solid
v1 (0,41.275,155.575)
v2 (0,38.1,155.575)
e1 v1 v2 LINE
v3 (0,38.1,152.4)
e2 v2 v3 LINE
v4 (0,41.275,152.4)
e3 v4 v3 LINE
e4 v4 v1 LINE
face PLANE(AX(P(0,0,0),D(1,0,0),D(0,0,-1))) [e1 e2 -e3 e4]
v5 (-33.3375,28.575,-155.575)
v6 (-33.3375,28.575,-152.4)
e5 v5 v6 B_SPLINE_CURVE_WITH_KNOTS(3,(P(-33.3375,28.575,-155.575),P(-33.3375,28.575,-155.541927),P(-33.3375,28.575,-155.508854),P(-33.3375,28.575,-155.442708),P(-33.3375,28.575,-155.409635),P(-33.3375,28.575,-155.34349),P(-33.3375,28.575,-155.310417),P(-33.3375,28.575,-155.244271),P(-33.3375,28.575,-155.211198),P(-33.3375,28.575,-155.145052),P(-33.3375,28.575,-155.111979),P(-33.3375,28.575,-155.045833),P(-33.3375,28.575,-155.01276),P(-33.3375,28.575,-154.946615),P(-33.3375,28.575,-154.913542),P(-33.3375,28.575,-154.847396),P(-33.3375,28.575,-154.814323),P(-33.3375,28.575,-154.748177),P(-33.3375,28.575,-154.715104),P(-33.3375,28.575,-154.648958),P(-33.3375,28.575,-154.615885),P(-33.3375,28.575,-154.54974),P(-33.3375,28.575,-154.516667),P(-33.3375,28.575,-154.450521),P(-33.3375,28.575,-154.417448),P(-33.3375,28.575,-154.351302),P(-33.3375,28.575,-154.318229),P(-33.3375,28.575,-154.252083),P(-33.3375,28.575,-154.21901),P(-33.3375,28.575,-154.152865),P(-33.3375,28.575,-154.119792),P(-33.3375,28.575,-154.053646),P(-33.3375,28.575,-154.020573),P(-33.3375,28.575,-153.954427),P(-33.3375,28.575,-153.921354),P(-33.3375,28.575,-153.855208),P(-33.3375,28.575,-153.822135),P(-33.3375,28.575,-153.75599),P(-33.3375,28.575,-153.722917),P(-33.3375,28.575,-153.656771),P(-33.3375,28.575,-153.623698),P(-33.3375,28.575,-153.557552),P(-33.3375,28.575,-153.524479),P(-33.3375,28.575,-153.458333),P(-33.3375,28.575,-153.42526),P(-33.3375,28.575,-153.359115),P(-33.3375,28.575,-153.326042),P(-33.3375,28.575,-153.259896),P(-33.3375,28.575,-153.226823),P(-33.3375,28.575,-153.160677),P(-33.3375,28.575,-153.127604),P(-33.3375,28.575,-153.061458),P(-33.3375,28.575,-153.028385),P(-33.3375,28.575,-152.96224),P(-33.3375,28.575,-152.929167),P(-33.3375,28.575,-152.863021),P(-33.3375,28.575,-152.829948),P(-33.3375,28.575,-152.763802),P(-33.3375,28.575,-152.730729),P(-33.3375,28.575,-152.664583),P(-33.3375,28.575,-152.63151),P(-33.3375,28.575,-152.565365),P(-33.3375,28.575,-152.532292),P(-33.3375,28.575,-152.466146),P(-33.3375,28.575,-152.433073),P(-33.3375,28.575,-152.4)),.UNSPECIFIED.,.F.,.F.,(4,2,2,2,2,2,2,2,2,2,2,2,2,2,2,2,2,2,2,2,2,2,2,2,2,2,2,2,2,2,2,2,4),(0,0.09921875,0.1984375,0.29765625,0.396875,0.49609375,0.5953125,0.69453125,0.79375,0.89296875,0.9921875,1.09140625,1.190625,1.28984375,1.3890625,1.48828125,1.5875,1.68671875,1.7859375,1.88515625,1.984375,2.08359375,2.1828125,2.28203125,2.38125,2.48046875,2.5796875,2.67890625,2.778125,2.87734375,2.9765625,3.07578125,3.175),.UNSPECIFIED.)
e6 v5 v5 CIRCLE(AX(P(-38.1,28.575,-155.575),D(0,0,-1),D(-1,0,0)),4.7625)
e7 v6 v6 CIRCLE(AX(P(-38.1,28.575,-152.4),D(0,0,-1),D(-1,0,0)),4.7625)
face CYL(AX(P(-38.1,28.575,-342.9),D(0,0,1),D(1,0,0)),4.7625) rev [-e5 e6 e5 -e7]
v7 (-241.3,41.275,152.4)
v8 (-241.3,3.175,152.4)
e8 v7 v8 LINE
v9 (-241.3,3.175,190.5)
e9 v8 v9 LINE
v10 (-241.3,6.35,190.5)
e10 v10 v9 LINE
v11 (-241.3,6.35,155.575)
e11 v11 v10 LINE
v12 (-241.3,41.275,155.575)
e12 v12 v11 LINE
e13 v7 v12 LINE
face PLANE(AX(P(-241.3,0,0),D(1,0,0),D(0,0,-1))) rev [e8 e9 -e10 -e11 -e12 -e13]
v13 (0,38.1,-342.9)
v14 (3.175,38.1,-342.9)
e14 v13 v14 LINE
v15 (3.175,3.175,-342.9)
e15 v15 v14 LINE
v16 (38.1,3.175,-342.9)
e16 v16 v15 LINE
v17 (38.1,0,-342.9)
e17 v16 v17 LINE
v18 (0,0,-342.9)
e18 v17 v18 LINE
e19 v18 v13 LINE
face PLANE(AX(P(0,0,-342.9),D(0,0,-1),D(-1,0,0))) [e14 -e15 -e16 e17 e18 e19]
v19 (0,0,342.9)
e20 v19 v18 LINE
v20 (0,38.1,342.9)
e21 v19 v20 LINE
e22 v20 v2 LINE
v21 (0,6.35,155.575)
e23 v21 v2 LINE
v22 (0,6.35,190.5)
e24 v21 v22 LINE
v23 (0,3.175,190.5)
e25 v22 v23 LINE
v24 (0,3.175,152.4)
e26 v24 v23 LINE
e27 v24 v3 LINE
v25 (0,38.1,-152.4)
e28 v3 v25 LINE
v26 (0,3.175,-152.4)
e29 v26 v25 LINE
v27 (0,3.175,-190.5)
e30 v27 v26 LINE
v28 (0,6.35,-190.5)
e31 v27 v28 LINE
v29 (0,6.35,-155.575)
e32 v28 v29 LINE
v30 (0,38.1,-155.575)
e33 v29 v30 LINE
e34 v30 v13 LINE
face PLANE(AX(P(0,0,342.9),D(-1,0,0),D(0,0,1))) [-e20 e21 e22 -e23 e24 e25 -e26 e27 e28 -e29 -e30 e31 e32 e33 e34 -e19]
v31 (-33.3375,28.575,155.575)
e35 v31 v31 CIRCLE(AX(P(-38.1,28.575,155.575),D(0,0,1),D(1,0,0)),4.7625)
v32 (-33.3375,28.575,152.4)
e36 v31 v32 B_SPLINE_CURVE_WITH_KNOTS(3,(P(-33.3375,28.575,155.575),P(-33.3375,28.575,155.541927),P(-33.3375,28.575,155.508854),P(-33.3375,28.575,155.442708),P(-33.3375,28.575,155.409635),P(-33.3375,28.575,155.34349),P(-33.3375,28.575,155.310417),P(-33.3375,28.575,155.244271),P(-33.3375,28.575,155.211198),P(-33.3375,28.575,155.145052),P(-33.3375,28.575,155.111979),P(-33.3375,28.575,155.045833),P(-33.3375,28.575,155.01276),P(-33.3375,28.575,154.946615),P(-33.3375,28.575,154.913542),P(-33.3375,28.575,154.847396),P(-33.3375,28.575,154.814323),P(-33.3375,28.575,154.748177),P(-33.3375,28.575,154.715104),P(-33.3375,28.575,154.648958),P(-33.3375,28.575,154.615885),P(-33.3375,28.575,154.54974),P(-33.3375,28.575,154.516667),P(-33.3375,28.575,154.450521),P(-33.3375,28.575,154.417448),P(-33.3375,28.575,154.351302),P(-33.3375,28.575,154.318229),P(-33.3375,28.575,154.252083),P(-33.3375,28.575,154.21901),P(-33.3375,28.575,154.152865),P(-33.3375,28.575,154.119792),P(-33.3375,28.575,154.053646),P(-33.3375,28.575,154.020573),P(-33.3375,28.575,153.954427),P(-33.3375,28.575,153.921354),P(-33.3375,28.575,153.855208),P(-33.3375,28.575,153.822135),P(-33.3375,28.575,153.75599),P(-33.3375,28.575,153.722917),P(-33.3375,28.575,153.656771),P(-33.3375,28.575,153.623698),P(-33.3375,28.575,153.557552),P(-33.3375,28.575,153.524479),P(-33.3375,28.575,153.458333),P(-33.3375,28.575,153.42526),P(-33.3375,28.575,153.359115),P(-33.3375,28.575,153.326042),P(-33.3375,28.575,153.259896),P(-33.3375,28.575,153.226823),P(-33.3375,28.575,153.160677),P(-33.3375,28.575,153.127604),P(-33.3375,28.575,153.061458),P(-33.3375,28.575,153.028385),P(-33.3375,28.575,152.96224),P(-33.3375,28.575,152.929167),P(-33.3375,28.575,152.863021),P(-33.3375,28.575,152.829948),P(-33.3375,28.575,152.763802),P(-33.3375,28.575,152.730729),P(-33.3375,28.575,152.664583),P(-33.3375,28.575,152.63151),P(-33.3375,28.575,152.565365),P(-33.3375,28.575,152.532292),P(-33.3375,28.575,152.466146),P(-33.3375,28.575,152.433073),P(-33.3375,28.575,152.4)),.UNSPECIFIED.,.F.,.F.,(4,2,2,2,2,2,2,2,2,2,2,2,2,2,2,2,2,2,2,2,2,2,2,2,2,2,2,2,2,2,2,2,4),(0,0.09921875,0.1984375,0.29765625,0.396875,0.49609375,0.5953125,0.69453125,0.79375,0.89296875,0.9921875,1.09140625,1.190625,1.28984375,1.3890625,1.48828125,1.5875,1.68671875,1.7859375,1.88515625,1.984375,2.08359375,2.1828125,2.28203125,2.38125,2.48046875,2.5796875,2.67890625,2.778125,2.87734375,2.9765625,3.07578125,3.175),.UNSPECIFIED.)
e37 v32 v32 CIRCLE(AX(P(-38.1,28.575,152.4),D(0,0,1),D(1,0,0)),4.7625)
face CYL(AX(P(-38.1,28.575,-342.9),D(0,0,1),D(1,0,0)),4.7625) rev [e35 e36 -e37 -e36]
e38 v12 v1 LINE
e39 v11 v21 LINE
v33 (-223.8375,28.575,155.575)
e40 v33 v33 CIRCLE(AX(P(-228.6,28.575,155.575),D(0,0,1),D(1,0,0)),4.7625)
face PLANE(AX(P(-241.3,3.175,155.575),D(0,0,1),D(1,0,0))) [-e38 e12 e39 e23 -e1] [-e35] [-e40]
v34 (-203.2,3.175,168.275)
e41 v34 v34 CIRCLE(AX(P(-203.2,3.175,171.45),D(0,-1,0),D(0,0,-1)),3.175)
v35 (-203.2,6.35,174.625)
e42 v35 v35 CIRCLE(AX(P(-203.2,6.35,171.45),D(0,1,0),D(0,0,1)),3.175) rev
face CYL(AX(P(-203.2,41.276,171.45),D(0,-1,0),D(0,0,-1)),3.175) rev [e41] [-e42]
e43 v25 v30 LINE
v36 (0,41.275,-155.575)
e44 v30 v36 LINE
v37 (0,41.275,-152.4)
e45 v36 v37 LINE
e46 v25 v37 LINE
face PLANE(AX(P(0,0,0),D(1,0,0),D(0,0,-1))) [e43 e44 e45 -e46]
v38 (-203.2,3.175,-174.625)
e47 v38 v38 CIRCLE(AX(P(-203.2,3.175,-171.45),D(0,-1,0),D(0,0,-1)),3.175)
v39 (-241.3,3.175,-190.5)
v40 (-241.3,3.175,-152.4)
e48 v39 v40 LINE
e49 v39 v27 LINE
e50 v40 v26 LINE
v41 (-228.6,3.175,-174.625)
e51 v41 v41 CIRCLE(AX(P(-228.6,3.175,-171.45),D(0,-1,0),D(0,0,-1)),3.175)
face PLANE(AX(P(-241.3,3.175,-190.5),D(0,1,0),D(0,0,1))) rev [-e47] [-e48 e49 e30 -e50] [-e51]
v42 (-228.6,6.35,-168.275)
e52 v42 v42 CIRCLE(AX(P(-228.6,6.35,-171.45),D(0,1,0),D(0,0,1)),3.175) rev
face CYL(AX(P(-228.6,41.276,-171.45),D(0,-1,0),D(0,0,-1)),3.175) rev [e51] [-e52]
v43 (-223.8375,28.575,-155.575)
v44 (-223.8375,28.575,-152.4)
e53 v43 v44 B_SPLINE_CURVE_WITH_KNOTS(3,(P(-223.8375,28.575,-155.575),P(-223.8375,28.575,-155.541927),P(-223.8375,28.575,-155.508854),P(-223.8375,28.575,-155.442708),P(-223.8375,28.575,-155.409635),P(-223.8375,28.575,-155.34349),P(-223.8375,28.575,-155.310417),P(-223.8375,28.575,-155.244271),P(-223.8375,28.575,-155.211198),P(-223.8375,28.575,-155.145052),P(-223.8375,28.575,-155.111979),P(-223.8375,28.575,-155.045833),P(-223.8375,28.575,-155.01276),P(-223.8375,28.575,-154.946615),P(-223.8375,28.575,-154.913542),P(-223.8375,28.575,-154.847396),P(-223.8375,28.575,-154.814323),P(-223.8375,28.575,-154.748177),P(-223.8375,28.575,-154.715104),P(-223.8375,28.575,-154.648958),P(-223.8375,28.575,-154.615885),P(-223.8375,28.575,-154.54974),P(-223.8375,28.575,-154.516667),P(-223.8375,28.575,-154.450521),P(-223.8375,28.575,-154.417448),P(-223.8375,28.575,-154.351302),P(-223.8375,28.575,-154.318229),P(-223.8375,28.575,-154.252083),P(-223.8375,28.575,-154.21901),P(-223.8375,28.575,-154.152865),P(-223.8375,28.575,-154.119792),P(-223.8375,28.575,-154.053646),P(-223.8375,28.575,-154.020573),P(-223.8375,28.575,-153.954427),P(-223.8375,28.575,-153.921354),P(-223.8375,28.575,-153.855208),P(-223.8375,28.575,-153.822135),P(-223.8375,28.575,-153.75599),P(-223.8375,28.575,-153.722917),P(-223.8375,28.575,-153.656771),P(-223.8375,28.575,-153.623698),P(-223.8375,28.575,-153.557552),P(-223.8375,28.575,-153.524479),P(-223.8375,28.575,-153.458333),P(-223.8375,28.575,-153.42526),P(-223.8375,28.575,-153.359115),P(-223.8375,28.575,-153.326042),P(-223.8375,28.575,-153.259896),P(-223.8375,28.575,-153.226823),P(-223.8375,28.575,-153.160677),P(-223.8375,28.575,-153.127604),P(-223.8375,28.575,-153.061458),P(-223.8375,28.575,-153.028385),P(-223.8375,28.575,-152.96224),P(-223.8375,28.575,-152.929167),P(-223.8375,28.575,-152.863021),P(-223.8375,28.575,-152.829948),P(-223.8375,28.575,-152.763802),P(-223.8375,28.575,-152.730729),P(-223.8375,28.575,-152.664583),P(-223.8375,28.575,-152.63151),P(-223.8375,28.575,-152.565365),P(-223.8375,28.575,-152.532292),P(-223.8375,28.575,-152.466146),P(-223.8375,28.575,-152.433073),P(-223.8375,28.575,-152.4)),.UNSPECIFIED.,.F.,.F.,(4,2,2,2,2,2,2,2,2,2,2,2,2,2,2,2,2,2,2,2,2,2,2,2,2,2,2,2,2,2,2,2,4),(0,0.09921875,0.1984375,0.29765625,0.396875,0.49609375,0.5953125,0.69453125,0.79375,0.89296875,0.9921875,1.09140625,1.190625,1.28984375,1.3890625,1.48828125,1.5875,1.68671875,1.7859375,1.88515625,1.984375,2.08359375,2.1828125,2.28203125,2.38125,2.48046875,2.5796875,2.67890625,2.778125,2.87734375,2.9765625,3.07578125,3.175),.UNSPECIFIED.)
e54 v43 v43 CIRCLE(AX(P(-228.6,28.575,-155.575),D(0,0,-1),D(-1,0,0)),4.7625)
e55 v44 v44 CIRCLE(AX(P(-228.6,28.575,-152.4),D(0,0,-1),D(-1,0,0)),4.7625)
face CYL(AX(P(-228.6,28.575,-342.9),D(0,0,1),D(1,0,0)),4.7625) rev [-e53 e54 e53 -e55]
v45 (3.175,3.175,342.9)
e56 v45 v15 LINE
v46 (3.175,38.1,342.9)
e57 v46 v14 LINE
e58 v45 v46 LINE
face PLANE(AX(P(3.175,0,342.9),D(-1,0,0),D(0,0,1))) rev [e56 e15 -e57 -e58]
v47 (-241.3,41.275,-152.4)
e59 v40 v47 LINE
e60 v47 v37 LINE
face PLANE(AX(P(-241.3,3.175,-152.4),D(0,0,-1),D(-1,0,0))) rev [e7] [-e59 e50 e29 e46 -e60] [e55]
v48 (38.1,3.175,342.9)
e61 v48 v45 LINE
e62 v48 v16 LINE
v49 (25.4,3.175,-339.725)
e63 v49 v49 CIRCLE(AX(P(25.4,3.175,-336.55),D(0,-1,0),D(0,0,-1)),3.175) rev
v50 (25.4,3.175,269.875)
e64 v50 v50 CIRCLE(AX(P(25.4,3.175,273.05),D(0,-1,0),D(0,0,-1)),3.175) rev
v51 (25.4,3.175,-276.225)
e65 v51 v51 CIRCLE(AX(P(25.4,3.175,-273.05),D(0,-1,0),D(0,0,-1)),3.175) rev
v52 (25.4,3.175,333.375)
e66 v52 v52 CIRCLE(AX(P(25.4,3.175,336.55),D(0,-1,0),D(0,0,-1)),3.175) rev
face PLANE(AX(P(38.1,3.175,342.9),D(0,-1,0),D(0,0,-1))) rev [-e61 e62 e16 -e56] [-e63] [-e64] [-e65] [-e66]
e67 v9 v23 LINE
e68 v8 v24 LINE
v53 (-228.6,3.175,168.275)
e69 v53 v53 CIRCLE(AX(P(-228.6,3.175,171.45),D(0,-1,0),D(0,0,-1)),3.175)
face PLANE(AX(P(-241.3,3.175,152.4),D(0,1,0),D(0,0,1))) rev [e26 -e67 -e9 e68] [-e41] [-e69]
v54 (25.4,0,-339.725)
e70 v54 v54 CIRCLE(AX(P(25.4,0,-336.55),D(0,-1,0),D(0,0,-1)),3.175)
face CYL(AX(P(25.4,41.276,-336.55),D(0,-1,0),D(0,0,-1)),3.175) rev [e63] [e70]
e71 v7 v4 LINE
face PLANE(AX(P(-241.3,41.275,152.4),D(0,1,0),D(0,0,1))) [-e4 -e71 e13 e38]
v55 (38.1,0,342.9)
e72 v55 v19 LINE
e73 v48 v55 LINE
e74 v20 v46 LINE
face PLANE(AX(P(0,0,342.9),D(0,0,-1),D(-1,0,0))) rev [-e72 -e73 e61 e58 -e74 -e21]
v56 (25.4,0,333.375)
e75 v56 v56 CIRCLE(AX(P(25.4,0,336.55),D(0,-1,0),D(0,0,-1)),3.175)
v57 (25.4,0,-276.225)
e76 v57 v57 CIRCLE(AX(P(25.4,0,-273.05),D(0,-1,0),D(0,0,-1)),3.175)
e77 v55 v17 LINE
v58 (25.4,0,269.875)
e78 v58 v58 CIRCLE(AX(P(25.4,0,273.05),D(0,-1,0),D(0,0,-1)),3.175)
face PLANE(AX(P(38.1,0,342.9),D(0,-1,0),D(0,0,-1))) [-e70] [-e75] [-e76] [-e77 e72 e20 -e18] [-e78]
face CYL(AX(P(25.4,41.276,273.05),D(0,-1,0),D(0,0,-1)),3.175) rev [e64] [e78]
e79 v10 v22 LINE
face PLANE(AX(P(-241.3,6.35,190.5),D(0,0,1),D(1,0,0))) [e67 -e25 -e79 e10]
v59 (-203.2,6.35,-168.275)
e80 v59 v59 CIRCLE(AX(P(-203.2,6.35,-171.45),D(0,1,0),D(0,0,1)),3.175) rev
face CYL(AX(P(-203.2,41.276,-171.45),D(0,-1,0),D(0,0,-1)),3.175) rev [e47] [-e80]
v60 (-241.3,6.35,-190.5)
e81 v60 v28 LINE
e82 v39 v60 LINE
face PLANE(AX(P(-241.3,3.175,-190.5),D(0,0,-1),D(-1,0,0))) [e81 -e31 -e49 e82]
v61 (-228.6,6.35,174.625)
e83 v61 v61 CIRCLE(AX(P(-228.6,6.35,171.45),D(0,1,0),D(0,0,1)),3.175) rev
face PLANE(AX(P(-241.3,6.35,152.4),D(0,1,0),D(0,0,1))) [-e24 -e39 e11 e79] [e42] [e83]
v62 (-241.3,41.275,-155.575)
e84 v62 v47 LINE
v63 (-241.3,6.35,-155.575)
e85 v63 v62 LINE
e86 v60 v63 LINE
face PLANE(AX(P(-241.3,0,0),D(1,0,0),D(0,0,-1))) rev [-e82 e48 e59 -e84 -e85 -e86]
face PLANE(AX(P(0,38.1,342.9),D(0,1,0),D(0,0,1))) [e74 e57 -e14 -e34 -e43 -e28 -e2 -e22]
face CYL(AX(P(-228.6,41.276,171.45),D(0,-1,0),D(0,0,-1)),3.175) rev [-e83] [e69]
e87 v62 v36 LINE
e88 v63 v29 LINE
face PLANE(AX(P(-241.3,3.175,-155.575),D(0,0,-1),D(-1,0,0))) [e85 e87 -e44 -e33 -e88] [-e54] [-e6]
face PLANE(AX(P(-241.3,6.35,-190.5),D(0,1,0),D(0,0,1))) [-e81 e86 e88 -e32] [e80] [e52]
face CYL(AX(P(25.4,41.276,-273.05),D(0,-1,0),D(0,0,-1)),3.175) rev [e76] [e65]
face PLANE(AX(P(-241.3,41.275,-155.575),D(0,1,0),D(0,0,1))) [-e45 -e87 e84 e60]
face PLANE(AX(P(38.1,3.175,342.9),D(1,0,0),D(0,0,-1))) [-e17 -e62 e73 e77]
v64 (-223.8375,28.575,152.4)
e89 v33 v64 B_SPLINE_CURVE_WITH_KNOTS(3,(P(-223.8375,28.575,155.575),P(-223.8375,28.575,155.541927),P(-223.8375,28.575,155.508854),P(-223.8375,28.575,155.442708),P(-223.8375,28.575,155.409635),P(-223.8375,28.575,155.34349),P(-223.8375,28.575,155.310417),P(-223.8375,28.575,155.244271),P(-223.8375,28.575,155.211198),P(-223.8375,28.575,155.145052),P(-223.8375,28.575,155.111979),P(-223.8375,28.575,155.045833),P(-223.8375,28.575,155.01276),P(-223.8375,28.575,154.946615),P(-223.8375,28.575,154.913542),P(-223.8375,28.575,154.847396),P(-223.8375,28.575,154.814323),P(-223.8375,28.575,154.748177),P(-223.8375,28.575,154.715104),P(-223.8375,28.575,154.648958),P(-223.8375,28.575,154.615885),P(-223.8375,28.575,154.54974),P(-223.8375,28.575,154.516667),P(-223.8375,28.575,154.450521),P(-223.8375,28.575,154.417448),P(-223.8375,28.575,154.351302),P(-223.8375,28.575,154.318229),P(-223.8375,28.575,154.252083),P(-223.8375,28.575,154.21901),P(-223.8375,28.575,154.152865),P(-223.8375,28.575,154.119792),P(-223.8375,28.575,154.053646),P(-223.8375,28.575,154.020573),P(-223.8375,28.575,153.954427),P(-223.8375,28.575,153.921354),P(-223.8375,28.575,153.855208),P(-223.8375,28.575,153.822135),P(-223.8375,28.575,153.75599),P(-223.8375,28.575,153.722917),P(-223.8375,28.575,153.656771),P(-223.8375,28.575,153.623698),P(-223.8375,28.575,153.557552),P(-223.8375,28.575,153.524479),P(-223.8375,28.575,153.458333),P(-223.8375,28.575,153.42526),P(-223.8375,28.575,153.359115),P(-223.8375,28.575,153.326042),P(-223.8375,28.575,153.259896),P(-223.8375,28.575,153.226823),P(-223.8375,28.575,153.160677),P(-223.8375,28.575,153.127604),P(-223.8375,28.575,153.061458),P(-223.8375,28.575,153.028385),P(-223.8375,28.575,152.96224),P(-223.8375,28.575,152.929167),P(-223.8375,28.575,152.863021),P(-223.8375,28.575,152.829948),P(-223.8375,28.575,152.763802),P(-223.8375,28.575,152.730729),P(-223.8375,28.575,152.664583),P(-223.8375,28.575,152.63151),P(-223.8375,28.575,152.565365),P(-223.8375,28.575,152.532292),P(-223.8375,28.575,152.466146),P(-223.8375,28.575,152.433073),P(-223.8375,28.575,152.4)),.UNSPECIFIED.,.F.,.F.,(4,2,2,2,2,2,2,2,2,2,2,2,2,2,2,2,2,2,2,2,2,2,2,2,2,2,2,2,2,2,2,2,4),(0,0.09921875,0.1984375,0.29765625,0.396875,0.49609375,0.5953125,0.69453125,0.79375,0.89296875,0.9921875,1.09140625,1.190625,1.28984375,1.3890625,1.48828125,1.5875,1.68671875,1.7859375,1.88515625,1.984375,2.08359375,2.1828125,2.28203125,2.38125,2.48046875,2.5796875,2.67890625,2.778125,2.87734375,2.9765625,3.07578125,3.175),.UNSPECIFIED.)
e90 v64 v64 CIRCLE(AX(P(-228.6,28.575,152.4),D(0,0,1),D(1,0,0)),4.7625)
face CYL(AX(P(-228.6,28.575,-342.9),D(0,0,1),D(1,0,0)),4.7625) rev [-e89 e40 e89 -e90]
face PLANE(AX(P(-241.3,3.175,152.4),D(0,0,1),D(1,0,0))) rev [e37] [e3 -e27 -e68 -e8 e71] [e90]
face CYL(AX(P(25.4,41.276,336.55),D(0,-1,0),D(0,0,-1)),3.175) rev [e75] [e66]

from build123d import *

# Parameters (mm, degrees)
EXTRUDE_THIN1_DEPTH     = 342.9
EXTRUDE_THIN2_DEPTH     = 241.3
CUT_EXTRUDE1_REACH      = 423.02
SKETCH3_R               = 3.175
CUT_EXTRUDE2_REACH      = 423.319
SKETCH4_R               = 3.175
CUT_EXTRUDE3_DEPTH      = 422.319030694
CUT_EXTRUDE3_DEPTH_BACK = 422.319030694
SKETCH5_R               = 4.7625


with BuildPart() as part:
    # Sketch1 → Extrude-Thin1 (new, symmetric)
    with BuildSketch(Plane.XY):
        Polygon((38.1, 0), (0, 0), (0, 38.1), (3.175, 38.1), (3.175, 3.175), (38.1, 3.175), align=None)
    extrude(amount=EXTRUDE_THIN1_DEPTH, both=True)

    # Sketch2 → Extrude-Thin2 (add)
    with BuildSketch(Plane.ZY):
        Polygon((-190.5, 3.175), (-152.4, 3.175), (-152.4, 41.275), (-155.575, 41.275), (-155.575, 6.35), (-190.5, 6.35), align=None)
        Polygon((190.5, 3.175), (152.4, 3.175), (152.4, 41.275), (155.575, 41.275), (155.575, 6.35), (190.5, 6.35), align=None)
    extrude(amount=EXTRUDE_THIN2_DEPTH)

    # Sketch3 → Cut-Extrude1 (cut, up to next)
    with BuildSketch(Plane.XZ.offset(-3.175), mode=Mode.PRIVATE) as cut_extrude1_sk1:
        with Locations((-228.6, 171.45)):
            Circle(SKETCH3_R)
    cut_extrude1_tool1 = extrude(cut_extrude1_sk1.sketch, amount=-CUT_EXTRUDE1_REACH, mode=Mode.PRIVATE) & part.part
    # Sketch3 → Cut-Extrude1 (cut, up to next)
    with BuildSketch(Plane.XZ.offset(-3.175), mode=Mode.PRIVATE) as cut_extrude1_sk2:
        with Locations((-203.2, 171.45)):
            Circle(SKETCH3_R)
    cut_extrude1_tool2 = extrude(cut_extrude1_sk2.sketch, amount=-CUT_EXTRUDE1_REACH, mode=Mode.PRIVATE) & part.part
    # Sketch3 → Cut-Extrude1 (cut, up to next)
    with BuildSketch(Plane.XZ.offset(-3.175), mode=Mode.PRIVATE) as cut_extrude1_sk3:
        with Locations((-228.6, -171.45)):
            Circle(SKETCH3_R)
    cut_extrude1_tool3 = extrude(cut_extrude1_sk3.sketch, amount=-CUT_EXTRUDE1_REACH, mode=Mode.PRIVATE) & part.part
    # Sketch3 → Cut-Extrude1 (cut, up to next)
    with BuildSketch(Plane.XZ.offset(-3.175), mode=Mode.PRIVATE) as cut_extrude1_sk4:
        with Locations((-203.2, -171.45)):
            Circle(SKETCH3_R)
    cut_extrude1_tool4 = extrude(cut_extrude1_sk4.sketch, amount=-CUT_EXTRUDE1_REACH, mode=Mode.PRIVATE) & part.part
    add(cut_extrude1_tool1.solids().sort_by_distance((-228.6, 3.175, 171.45))[0], mode=Mode.SUBTRACT)
    add(cut_extrude1_tool2.solids().sort_by_distance((-203.2, 3.175, 171.45))[0], mode=Mode.SUBTRACT)
    add(cut_extrude1_tool3.solids().sort_by_distance((-228.6, 3.175, -171.45))[0], mode=Mode.SUBTRACT)
    add(cut_extrude1_tool4.solids().sort_by_distance((-203.2, 3.175, -171.45))[0], mode=Mode.SUBTRACT)

    # Sketch4 → Cut-Extrude2 (cut, up to next)
    with BuildSketch(Plane.XZ, mode=Mode.PRIVATE) as cut_extrude2_sk1:
        with Locations((25.4, -336.55)):
            Circle(SKETCH4_R)
    cut_extrude2_tool1 = extrude(cut_extrude2_sk1.sketch, amount=-CUT_EXTRUDE2_REACH, mode=Mode.PRIVATE) & part.part
    # Sketch4 → Cut-Extrude2 (cut, up to next)
    with BuildSketch(Plane.XZ, mode=Mode.PRIVATE) as cut_extrude2_sk2:
        with Locations((25.4, -273.05)):
            Circle(SKETCH4_R)
    cut_extrude2_tool2 = extrude(cut_extrude2_sk2.sketch, amount=-CUT_EXTRUDE2_REACH, mode=Mode.PRIVATE) & part.part
    # Sketch4 → Cut-Extrude2 (cut, up to next)
    with BuildSketch(Plane.XZ, mode=Mode.PRIVATE) as cut_extrude2_sk3:
        with Locations((25.4, 273.05)):
            Circle(SKETCH4_R)
    cut_extrude2_tool3 = extrude(cut_extrude2_sk3.sketch, amount=-CUT_EXTRUDE2_REACH, mode=Mode.PRIVATE) & part.part
    # Sketch4 → Cut-Extrude2 (cut, up to next)
    with BuildSketch(Plane.XZ, mode=Mode.PRIVATE) as cut_extrude2_sk4:
        with Locations((25.4, 336.55)):
            Circle(SKETCH4_R)
    cut_extrude2_tool4 = extrude(cut_extrude2_sk4.sketch, amount=-CUT_EXTRUDE2_REACH, mode=Mode.PRIVATE) & part.part
    add(cut_extrude2_tool1.solids().sort_by_distance((25.4, 0, -336.55))[0], mode=Mode.SUBTRACT)
    add(cut_extrude2_tool2.solids().sort_by_distance((25.4, 0, -273.05))[0], mode=Mode.SUBTRACT)
    add(cut_extrude2_tool3.solids().sort_by_distance((25.4, 0, 273.05))[0], mode=Mode.SUBTRACT)
    add(cut_extrude2_tool4.solids().sort_by_distance((25.4, 0, 336.55))[0], mode=Mode.SUBTRACT)

    # Sketch5 → Cut-Extrude3 (cut, two sides: drawn at the far end of the back side and taken through both)
    with BuildSketch(Plane.XY.offset(-CUT_EXTRUDE3_DEPTH_BACK)):
        with Locations((-228.6, 28.575)):
            Circle(SKETCH5_R)
        with Locations((-38.1, 28.575)):
            Circle(SKETCH5_R)
    extrude(amount=CUT_EXTRUDE3_DEPTH + CUT_EXTRUDE3_DEPTH_BACK, mode=Mode.SUBTRACT)


solid = part.part
